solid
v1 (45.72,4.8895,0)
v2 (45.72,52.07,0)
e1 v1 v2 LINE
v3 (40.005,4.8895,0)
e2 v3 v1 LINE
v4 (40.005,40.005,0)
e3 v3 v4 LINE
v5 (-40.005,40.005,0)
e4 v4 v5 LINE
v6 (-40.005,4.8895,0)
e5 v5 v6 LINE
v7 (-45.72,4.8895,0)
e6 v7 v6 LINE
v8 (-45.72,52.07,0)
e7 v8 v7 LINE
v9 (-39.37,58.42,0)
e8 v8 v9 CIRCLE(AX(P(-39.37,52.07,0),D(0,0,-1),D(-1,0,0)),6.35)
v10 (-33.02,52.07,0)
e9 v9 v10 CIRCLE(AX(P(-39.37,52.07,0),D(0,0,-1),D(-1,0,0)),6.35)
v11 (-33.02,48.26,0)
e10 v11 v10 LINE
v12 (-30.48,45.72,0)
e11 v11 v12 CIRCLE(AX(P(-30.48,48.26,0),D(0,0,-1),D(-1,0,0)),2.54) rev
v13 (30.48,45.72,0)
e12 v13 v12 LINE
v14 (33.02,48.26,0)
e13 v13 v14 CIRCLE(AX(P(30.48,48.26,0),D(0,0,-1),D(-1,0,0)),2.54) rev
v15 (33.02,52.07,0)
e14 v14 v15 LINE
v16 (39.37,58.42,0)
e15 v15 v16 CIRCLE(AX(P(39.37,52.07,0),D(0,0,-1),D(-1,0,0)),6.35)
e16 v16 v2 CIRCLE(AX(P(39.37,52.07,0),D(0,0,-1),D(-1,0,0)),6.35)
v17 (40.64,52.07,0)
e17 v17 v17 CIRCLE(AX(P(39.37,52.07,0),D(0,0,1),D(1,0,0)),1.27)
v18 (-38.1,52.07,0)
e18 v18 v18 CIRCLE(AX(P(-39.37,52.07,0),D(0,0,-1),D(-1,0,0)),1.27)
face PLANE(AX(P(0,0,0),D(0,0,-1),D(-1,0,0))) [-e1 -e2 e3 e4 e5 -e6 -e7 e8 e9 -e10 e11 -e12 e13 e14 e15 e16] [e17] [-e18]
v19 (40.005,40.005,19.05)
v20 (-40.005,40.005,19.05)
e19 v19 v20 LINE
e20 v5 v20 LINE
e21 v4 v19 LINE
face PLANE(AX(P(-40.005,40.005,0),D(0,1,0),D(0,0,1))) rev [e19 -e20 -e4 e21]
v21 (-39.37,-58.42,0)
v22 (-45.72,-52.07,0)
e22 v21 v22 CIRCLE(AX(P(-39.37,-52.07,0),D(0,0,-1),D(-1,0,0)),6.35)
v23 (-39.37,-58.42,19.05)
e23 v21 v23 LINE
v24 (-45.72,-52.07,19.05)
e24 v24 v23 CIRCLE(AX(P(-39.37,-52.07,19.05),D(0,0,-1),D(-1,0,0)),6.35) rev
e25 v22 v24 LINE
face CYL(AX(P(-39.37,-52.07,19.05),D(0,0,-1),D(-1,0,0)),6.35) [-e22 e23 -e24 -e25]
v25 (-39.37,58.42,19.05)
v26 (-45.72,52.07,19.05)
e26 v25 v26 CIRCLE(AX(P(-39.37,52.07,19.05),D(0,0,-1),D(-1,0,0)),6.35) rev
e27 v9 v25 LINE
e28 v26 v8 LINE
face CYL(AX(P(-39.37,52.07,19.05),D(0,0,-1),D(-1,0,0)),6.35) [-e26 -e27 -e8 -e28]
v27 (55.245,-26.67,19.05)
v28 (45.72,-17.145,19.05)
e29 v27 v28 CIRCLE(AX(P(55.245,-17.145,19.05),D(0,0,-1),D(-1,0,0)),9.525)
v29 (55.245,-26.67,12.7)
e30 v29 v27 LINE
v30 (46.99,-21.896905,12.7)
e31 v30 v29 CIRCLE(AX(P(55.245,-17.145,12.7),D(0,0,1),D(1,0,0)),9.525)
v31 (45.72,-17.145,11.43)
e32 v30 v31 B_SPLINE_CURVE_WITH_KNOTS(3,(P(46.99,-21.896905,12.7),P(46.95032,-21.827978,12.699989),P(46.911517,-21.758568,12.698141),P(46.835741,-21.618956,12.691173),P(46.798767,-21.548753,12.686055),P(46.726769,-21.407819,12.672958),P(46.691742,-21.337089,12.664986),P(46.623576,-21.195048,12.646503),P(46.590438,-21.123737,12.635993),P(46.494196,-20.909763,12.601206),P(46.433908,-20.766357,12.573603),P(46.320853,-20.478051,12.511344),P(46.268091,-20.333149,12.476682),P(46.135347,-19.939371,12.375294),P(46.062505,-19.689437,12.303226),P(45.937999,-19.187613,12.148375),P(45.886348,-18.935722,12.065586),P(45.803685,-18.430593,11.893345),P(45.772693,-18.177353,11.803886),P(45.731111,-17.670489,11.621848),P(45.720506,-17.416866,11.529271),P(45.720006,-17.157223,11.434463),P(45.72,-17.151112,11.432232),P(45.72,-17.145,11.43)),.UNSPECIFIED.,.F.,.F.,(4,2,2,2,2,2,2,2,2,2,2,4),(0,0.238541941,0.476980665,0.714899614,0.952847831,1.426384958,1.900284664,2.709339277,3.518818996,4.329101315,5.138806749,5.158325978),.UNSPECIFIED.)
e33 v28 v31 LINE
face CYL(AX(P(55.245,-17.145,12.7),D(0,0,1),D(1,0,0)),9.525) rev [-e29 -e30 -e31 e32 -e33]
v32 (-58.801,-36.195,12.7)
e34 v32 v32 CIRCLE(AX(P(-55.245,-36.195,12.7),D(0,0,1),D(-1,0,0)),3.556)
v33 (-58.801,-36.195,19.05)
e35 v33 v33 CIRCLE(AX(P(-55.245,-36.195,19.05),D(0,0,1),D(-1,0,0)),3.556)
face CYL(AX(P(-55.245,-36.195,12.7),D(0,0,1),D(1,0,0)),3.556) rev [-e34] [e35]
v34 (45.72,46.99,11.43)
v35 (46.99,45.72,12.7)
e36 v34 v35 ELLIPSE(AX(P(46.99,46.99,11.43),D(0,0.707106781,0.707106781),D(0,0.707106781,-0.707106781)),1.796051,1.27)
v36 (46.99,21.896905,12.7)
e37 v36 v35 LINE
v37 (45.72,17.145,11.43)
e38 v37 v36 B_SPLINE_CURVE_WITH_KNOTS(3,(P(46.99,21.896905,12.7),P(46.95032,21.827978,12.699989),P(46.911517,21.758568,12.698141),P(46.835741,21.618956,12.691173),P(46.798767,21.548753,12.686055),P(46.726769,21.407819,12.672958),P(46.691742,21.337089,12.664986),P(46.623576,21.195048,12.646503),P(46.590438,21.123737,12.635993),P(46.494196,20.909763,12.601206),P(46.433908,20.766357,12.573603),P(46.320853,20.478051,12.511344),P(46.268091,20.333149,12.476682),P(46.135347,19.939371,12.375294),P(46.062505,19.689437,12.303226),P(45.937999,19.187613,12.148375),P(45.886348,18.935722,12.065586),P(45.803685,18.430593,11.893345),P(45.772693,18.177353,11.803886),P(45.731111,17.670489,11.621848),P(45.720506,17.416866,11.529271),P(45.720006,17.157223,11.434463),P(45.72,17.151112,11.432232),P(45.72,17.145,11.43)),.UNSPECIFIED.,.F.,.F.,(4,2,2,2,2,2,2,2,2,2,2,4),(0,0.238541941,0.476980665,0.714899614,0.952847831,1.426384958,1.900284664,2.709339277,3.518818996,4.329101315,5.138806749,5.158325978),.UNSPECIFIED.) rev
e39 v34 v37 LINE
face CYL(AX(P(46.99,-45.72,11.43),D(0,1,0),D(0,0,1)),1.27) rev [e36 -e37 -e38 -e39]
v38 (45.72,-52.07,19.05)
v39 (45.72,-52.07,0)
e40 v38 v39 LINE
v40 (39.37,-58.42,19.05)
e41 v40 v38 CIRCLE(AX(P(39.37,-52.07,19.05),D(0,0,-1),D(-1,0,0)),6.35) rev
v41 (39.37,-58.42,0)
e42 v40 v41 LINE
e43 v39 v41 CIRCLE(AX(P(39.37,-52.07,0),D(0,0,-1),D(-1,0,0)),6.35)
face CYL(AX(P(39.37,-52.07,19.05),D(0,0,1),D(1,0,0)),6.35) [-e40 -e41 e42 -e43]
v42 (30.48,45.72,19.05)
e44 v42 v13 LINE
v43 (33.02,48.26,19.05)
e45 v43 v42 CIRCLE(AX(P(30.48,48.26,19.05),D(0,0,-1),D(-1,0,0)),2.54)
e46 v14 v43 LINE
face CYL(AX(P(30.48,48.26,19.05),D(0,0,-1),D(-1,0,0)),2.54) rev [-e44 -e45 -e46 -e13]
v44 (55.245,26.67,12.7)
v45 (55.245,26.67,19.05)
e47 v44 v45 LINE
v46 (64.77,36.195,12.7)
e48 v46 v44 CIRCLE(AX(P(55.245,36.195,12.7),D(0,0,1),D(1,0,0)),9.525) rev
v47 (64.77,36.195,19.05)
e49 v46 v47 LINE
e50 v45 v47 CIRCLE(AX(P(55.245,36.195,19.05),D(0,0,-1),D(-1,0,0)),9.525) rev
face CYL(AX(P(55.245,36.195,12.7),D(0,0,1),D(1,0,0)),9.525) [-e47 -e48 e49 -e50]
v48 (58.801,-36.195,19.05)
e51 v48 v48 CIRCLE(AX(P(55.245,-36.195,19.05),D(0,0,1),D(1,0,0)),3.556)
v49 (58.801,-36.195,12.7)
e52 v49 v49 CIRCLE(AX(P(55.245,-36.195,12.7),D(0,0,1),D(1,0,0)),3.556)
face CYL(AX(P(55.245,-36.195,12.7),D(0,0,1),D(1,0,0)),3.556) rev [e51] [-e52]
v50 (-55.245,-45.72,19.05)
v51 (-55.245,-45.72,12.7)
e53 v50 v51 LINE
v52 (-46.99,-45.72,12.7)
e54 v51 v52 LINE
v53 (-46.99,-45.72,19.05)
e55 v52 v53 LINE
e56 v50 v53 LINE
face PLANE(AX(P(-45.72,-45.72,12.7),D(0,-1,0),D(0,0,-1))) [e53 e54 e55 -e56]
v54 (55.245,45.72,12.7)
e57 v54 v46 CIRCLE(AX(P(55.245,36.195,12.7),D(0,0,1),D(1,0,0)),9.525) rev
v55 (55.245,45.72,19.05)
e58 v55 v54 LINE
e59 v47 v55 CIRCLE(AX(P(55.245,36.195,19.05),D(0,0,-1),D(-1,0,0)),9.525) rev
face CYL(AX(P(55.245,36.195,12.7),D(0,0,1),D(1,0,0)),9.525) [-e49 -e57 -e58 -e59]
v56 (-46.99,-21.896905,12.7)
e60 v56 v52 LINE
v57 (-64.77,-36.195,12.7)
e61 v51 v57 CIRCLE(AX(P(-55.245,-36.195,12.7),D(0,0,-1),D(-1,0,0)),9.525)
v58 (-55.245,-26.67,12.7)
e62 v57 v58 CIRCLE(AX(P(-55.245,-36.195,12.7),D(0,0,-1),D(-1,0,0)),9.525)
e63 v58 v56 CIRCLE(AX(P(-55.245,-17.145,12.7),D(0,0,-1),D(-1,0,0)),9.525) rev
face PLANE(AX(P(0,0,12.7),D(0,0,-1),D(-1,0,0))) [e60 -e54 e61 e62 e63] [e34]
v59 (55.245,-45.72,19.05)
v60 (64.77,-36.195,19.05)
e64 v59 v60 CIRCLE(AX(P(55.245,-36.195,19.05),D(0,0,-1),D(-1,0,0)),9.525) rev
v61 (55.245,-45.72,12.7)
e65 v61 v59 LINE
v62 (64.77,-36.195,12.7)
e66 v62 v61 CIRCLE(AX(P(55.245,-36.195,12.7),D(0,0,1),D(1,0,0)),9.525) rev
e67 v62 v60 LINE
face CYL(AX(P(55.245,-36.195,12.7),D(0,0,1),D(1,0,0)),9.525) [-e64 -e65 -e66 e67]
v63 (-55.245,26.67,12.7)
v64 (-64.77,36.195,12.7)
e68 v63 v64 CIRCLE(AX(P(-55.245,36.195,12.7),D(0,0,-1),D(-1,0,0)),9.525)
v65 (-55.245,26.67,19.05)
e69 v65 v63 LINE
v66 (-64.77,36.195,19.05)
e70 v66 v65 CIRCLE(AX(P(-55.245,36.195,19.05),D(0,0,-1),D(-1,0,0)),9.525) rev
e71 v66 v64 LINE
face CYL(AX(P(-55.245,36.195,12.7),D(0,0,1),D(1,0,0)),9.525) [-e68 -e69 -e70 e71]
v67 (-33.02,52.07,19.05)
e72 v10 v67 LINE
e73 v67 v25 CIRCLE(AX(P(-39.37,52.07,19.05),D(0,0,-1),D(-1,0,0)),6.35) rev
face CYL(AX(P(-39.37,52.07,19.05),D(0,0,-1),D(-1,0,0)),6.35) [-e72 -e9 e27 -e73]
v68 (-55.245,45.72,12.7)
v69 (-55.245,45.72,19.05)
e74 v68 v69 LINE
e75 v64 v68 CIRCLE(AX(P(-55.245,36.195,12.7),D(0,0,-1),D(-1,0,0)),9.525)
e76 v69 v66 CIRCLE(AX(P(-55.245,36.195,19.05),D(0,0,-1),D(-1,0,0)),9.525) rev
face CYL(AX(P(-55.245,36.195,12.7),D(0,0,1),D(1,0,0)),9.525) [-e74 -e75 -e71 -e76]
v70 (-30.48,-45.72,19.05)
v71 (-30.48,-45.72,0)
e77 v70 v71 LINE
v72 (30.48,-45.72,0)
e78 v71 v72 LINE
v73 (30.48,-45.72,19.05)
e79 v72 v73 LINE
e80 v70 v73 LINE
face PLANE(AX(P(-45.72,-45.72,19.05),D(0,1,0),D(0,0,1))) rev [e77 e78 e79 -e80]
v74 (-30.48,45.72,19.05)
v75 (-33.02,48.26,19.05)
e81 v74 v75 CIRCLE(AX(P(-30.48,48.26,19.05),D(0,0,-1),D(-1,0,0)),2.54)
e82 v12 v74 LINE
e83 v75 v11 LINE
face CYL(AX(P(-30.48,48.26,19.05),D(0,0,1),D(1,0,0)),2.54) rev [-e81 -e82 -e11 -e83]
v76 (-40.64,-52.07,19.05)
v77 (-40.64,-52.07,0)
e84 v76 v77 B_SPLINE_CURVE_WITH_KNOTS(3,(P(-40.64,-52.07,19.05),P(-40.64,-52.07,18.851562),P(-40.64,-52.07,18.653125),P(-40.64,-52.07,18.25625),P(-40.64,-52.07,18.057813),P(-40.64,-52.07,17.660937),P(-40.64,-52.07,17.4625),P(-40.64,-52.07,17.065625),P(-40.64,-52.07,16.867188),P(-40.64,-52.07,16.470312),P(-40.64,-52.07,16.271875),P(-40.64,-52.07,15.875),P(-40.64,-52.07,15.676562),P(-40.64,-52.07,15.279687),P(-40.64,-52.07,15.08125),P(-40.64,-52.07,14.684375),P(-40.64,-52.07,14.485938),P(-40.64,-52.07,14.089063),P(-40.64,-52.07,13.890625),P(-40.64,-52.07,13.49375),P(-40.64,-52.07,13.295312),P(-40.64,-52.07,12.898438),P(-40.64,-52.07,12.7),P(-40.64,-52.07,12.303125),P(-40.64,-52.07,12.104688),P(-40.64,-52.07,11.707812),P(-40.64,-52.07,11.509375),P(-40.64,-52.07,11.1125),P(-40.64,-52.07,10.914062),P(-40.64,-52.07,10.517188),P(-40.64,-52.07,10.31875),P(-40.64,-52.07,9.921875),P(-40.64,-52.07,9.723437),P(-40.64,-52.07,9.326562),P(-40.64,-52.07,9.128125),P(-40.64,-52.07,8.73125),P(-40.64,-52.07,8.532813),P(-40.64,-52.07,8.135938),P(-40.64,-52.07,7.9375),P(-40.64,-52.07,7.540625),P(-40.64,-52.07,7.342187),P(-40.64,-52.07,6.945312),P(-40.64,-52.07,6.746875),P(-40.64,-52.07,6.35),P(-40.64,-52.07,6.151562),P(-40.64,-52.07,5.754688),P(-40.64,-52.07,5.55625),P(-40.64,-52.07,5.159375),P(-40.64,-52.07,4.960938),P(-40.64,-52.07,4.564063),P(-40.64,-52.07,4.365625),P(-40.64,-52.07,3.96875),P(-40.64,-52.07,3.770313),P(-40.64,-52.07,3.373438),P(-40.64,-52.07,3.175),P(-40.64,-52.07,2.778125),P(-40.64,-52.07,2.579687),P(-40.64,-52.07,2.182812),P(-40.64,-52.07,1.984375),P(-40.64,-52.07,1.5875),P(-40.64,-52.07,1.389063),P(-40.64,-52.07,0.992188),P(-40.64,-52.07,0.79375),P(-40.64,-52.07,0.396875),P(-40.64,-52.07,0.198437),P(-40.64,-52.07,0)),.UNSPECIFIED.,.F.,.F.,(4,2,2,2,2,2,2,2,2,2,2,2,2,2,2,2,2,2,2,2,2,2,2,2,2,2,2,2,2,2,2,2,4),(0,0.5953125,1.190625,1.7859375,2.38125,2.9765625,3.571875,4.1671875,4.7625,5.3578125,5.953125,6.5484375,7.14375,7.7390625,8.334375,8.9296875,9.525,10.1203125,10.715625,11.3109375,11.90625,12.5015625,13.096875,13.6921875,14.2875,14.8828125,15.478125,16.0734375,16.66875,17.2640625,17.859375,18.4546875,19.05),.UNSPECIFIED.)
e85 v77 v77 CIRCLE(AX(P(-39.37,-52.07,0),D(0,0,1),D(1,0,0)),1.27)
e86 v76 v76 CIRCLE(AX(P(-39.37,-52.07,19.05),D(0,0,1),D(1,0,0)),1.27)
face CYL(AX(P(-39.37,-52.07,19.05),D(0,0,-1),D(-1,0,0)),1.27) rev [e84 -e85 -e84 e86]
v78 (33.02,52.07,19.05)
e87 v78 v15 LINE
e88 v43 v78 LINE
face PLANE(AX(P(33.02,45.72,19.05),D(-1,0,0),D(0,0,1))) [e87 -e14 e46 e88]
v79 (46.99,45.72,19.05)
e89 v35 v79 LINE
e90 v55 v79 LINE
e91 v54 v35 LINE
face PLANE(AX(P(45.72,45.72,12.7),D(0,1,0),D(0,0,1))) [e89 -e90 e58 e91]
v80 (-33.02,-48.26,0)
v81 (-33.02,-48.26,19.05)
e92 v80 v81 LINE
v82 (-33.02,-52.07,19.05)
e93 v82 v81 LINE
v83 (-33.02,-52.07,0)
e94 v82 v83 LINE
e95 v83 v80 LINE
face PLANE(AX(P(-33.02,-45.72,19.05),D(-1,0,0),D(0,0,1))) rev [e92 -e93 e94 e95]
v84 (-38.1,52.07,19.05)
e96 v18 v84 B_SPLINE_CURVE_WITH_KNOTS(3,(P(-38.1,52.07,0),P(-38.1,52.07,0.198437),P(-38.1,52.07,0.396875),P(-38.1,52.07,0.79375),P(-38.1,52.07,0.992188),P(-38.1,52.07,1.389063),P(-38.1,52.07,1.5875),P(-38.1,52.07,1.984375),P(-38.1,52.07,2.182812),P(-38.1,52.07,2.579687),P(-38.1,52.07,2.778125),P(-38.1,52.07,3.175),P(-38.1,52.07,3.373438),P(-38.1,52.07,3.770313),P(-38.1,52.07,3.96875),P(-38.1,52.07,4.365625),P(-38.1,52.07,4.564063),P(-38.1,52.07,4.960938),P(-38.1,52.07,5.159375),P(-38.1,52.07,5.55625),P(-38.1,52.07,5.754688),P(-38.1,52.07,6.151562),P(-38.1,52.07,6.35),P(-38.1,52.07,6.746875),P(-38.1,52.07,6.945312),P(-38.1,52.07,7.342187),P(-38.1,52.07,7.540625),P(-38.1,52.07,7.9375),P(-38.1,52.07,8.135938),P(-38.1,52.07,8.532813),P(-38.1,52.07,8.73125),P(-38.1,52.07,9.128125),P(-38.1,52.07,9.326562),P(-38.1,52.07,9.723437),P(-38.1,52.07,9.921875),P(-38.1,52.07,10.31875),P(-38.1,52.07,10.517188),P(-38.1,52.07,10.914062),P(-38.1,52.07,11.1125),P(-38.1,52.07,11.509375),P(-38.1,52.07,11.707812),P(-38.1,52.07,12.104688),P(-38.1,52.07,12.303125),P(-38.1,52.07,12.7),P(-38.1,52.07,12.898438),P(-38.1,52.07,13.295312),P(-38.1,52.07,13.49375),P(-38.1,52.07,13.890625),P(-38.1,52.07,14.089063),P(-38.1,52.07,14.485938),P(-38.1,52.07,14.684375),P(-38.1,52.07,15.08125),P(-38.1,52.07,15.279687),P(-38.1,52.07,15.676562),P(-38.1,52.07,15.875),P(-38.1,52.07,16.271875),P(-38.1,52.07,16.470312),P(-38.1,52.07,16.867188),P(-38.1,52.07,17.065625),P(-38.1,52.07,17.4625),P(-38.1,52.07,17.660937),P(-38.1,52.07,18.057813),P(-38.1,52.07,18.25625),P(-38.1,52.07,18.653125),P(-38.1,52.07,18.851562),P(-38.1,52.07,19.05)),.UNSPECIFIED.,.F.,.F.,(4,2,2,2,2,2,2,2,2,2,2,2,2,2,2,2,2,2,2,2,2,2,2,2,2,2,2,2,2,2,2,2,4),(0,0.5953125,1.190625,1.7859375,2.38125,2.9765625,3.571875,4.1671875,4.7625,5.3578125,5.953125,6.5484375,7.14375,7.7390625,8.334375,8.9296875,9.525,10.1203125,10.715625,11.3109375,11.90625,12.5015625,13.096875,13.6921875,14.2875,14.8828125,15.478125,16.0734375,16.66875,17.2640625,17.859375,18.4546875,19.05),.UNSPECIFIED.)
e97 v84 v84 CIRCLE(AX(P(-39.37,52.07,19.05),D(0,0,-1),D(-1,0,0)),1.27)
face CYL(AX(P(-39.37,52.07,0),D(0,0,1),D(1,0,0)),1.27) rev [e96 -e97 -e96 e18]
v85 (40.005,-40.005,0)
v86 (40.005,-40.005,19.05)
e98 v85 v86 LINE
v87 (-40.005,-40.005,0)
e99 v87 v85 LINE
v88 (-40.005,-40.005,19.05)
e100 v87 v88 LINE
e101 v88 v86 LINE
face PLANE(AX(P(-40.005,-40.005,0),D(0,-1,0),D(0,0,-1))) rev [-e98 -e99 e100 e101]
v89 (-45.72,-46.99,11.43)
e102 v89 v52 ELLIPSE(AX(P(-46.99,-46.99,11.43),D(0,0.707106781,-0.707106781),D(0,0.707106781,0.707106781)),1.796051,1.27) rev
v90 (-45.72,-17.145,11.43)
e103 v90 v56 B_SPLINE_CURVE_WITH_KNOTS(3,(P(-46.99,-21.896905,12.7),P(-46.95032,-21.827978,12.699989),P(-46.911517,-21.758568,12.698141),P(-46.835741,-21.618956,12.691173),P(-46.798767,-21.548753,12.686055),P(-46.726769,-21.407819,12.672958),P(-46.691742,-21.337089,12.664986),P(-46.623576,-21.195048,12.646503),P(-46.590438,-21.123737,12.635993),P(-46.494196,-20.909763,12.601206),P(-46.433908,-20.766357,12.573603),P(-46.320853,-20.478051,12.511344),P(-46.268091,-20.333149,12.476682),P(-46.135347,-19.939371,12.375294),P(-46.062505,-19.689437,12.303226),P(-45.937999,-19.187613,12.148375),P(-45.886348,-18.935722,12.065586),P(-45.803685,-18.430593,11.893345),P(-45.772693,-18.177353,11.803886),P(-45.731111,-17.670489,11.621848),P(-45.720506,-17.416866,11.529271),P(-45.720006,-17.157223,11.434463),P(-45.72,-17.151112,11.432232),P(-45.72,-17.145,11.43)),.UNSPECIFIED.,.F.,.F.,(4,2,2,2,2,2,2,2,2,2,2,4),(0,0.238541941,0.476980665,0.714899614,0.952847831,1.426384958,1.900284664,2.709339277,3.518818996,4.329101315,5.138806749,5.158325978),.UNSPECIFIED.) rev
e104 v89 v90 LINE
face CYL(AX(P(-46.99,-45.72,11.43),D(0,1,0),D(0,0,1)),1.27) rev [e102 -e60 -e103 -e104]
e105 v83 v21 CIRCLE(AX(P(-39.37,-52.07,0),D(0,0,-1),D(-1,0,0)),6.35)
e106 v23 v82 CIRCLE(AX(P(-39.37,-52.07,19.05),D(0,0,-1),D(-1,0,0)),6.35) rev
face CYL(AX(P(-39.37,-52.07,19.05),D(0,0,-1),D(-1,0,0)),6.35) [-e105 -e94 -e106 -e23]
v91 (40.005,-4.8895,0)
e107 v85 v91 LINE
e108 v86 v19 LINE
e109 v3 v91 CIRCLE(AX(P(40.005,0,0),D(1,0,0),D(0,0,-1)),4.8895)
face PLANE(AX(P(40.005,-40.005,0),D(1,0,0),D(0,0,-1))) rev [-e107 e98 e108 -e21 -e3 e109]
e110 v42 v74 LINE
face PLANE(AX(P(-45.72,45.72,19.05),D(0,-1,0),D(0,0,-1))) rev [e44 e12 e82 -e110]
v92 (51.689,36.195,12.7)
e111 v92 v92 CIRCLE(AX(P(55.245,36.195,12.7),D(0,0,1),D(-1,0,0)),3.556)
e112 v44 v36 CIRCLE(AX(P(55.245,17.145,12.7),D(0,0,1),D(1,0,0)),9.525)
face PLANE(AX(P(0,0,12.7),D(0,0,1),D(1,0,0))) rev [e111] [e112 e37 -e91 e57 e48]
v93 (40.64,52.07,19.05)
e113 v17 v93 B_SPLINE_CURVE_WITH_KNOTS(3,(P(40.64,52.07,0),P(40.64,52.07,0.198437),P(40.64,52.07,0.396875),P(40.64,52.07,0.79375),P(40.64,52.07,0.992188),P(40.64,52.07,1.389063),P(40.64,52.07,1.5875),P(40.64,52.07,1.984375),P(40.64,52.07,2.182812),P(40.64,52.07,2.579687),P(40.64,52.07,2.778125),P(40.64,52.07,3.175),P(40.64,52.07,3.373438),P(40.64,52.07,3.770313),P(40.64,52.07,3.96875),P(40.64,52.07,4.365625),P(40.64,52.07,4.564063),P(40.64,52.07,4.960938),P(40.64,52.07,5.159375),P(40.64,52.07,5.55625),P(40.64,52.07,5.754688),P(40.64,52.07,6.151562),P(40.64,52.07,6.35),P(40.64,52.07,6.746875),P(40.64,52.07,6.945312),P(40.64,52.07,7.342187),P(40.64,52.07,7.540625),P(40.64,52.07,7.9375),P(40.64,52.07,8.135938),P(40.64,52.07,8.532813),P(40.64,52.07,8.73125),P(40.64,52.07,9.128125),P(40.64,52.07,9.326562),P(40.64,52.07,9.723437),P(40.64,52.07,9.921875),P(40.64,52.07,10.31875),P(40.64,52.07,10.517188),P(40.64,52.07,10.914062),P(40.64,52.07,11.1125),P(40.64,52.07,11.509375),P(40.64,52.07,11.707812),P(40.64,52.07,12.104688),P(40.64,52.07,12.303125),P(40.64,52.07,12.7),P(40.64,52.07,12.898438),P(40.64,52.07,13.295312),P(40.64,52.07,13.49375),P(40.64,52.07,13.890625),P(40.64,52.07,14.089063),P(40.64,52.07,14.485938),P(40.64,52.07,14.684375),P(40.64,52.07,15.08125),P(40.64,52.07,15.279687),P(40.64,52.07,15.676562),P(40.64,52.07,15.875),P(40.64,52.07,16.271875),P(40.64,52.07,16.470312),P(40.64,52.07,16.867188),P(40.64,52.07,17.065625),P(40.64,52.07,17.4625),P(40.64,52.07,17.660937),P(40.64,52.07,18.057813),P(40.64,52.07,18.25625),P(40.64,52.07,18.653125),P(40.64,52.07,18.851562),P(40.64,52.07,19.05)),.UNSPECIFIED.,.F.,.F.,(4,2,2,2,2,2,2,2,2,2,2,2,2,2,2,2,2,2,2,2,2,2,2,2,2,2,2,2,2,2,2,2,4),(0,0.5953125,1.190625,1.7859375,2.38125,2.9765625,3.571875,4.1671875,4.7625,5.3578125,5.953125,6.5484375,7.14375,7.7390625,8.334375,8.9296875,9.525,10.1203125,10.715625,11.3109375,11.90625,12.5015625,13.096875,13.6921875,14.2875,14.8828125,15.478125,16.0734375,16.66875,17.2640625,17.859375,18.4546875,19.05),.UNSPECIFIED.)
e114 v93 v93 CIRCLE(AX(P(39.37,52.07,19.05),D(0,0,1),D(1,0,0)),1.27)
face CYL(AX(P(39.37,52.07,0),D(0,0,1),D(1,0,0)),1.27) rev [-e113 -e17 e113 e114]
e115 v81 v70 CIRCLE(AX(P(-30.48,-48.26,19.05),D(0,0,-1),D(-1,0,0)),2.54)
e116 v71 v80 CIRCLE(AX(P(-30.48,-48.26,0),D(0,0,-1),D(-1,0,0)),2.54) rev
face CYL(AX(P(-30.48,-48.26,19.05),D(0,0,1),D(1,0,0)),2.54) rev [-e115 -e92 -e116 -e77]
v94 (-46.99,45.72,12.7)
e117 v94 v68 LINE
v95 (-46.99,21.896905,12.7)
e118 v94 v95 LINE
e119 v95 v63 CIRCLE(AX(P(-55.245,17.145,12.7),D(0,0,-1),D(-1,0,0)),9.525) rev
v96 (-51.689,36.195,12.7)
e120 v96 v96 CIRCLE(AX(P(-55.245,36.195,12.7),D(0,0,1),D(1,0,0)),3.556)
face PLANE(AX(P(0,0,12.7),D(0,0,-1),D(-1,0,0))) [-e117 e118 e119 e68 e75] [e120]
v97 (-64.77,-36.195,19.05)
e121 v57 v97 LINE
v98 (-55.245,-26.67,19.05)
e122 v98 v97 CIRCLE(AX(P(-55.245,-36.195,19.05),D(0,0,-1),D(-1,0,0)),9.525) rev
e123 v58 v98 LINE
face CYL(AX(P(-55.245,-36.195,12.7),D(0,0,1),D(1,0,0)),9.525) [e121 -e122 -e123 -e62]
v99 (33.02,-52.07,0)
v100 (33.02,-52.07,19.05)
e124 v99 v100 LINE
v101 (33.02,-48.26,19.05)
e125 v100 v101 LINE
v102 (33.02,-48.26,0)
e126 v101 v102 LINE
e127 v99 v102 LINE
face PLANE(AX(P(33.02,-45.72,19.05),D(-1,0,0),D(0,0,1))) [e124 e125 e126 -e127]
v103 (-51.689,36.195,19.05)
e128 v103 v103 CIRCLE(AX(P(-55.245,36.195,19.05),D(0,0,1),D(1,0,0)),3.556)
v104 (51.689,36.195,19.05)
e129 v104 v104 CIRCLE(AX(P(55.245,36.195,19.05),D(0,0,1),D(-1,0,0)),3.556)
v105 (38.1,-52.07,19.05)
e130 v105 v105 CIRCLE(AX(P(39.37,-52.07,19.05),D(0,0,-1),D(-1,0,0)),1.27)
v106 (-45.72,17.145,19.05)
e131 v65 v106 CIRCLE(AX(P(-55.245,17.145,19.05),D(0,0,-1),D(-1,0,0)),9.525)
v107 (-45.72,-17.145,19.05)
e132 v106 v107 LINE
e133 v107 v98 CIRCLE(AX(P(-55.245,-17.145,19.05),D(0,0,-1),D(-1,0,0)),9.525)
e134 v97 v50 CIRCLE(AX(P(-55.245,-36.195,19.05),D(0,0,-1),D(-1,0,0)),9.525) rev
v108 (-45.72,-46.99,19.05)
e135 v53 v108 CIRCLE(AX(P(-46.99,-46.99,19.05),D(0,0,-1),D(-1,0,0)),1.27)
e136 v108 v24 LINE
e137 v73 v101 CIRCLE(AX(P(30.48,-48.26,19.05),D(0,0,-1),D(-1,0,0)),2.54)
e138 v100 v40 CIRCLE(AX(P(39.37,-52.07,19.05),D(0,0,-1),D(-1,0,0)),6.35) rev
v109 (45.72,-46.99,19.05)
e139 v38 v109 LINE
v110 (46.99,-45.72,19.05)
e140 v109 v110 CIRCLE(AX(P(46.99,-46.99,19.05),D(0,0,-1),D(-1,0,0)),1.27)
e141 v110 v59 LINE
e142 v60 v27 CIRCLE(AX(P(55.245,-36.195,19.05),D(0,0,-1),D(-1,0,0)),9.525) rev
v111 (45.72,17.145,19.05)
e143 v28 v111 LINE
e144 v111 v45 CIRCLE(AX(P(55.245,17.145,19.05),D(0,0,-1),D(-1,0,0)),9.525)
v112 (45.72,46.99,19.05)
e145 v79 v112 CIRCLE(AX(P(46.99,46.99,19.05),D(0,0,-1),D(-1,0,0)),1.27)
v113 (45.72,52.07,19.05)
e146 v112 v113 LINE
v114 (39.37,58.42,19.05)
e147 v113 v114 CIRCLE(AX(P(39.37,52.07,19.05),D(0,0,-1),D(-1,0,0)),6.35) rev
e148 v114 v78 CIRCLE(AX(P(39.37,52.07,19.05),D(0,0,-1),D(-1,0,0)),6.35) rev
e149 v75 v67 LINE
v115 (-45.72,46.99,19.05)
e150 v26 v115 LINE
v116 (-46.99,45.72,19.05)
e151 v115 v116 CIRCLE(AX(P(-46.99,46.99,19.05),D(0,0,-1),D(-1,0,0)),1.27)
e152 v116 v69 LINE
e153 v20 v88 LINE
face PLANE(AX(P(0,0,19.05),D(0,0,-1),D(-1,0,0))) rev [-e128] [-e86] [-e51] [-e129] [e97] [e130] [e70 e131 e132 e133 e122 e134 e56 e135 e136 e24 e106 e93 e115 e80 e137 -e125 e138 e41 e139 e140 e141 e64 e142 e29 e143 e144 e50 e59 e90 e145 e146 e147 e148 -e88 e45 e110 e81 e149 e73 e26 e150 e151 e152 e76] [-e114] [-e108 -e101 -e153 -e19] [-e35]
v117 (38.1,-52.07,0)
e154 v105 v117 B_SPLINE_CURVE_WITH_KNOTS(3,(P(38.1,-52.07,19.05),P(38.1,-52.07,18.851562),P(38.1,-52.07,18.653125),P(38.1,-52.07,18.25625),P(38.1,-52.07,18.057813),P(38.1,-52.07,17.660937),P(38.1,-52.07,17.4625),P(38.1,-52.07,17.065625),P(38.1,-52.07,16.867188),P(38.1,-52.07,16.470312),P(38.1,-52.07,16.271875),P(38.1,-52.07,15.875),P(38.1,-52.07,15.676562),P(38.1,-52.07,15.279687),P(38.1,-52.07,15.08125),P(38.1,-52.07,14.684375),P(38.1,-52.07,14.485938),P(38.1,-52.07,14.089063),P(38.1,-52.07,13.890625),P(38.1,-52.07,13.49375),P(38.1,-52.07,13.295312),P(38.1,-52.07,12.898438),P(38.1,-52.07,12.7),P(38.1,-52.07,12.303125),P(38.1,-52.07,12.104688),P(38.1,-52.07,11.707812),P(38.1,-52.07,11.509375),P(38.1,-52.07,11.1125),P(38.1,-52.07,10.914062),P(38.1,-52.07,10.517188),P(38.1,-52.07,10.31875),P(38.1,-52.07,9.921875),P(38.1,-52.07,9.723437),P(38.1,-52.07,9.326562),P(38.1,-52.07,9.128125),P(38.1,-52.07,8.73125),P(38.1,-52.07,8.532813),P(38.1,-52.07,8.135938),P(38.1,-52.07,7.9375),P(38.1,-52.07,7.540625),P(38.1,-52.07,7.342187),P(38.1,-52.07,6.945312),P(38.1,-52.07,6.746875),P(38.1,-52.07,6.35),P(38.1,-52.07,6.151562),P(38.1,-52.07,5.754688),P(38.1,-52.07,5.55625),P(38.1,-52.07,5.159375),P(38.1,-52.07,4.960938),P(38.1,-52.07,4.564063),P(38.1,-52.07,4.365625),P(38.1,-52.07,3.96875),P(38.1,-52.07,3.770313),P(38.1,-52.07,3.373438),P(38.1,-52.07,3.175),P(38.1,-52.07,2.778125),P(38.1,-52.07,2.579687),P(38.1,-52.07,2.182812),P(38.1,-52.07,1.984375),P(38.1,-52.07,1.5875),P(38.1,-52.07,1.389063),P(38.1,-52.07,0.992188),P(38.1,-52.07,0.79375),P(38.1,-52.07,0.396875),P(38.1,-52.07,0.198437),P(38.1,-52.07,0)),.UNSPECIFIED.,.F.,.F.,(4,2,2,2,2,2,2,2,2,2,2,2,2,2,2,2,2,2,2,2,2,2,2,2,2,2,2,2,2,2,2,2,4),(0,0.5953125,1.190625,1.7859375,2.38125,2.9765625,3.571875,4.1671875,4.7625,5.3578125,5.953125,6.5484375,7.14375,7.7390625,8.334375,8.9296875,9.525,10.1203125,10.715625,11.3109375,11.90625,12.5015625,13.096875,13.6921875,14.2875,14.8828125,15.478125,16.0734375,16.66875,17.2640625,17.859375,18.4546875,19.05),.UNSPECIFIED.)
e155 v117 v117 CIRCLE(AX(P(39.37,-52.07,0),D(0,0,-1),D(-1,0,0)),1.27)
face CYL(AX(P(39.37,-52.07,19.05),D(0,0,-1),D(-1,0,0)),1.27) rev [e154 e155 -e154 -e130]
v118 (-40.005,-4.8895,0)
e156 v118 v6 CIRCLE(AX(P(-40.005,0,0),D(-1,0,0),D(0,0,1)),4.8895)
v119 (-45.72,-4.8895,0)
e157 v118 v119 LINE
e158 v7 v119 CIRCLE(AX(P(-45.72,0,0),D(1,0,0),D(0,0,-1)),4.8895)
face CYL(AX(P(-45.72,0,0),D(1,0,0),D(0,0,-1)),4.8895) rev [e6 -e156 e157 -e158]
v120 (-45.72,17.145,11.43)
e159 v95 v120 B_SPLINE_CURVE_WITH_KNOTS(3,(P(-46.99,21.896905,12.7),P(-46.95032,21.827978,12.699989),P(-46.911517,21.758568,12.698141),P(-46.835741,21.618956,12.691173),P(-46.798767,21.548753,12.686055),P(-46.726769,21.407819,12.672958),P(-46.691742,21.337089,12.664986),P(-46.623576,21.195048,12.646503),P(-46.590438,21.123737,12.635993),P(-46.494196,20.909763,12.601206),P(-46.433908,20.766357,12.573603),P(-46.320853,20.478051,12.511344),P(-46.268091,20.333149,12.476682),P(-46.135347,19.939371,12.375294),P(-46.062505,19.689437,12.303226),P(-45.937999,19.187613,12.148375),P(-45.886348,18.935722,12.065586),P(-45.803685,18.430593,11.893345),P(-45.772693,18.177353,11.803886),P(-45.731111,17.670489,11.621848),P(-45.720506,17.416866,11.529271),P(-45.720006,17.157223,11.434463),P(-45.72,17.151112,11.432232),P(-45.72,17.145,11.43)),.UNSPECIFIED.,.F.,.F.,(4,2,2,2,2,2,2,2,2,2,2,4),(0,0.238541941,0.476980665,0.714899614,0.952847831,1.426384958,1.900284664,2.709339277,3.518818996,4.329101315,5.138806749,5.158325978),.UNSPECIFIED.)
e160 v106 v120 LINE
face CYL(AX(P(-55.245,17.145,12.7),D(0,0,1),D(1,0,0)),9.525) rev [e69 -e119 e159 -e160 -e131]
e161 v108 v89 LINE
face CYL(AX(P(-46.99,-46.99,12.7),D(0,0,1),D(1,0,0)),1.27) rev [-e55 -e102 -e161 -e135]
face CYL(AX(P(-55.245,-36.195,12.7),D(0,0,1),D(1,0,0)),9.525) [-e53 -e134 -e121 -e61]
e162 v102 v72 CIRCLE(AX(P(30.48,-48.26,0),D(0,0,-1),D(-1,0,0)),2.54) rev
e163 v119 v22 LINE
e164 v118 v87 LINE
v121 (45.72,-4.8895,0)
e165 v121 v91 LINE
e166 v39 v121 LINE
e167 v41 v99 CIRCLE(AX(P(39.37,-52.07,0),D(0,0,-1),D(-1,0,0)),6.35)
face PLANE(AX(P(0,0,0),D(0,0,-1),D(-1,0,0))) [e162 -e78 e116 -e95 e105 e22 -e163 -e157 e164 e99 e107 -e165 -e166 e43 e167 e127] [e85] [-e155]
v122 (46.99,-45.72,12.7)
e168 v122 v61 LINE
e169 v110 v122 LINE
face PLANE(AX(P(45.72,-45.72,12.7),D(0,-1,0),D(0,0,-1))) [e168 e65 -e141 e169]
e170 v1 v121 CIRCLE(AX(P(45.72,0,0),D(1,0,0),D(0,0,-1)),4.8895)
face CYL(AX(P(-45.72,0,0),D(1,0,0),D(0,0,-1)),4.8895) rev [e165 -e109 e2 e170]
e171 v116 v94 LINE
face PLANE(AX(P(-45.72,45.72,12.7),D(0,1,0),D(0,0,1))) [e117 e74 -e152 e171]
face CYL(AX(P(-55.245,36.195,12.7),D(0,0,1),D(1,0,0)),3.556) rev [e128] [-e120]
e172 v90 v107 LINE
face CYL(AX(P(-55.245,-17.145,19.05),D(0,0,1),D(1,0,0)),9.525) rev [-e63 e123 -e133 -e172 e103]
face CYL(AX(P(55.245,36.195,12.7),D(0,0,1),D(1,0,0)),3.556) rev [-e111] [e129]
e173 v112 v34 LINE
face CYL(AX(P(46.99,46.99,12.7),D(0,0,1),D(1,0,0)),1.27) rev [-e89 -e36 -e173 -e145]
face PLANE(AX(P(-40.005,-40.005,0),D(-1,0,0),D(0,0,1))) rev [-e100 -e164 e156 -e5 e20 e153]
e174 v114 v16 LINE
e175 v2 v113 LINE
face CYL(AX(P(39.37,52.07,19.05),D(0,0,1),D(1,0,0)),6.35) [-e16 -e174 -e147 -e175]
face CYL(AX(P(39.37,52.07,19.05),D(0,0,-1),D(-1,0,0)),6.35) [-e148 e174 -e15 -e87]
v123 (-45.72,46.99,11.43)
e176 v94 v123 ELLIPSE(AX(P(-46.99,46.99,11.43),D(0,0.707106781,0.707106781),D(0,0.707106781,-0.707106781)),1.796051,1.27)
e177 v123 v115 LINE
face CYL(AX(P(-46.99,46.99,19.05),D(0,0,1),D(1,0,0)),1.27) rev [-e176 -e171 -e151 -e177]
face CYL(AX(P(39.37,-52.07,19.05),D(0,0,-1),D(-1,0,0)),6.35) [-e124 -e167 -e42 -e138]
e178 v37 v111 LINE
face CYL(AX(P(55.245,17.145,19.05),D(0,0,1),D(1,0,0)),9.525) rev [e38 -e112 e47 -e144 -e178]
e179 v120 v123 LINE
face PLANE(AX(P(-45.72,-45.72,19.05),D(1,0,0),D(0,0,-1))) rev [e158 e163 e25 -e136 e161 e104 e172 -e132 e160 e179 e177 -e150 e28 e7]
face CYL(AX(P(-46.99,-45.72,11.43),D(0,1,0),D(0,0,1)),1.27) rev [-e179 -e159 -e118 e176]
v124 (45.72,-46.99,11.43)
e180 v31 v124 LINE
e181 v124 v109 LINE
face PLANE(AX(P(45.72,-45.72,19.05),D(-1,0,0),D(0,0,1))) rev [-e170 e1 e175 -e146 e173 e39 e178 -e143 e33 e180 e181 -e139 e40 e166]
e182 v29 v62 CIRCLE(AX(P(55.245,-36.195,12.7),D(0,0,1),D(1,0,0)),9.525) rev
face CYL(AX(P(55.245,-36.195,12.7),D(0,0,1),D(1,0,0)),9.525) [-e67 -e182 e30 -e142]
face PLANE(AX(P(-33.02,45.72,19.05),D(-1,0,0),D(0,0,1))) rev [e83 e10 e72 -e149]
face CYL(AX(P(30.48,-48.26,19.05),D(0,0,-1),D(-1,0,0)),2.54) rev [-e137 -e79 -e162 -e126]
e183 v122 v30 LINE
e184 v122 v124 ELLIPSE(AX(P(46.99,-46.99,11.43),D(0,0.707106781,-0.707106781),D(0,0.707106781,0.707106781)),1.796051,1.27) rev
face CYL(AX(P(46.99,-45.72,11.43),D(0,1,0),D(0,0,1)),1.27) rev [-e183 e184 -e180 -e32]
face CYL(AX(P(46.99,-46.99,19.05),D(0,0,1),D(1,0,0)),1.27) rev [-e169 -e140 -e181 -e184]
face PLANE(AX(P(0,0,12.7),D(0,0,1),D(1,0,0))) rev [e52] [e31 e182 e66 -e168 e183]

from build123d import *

# Parameters (mm, degrees)
SKETCH1_W            = 91.44
SKETCH1_H            = 91.44
BOSS_EXTRUDE1_DEPTH  = 19.05
SKETCH2_W            = 80.01
SKETCH2_H            = 80.01
CUT_EXTRUDE1_DEPTH   = 68.405780909
SKETCH3_R            = 4.8895
CUT_EXTRUDE2_DEPTH   = 104.992761767
SKETCH4_W            = 12.7
SKETCH4_H            = 12.7
BOSS_EXTRUDE2_DEPTH  = 19.05
SKETCH5_R            = 1.27
CUT_EXTRUDE3_DEPTH   = 77.590582319
FILLET1_R            = 6.35
SKETCH6_W            = 12.7
SKETCH6_H            = 12.7
SKETCH6_R            = 1.27
BOSS_EXTRUDE3_DEPTH  = 19.05
FILLET4_R            = 6.35
FILLET1_OF_MIRROR8_R = 6.35
FILLET4_OF_MIRROR8_R = 6.35
FILLET5_R            = 2.54
SKETCH7_W            = 19.05
SKETCH7_H            = 19.05
SKETCH7_R            = 3.556
BOSS_EXTRUDE4_DEPTH  = 6.35
FILLET6_R            = 9.525
FILLET7_R            = 1.27
FILLET8_R            = 1.27


with BuildPart() as part:
    # Sketch1 → Boss-Extrude1 (new body)
    with BuildSketch(Plane.XY):
        Rectangle(SKETCH1_W, SKETCH1_H)
    extrude(amount=BOSS_EXTRUDE1_DEPTH)

    # Sketch2 → Cut-Extrude1 (cut, through all)
    with BuildSketch(Plane.XY.offset(19.05)):
        Rectangle(SKETCH2_W, SKETCH2_H)
    extrude(amount=-CUT_EXTRUDE1_DEPTH, mode=Mode.SUBTRACT)

    # Sketch3 → Cut-Extrude2 (cut, through all)
    with BuildSketch(Plane(origin=(45.72, 0, 0), x_dir=(0, 0, -1), z_dir=(1, 0, 0))):
        Circle(SKETCH3_R)
        with Locations((0, 57.404)):
            Circle(SKETCH3_R)
        with Locations((0, -57.404)):
            Circle(SKETCH3_R)
    extrude(amount=-CUT_EXTRUDE2_DEPTH, mode=Mode.SUBTRACT)

    # Sketch4 → Boss-Extrude2 (add, through all)
    with BuildSketch(Plane(origin=(0, 0, 0), x_dir=(-1, 0, 0), z_dir=(0, 0, -1))):
        with Locations((-39.37, 52.07)):
            Rectangle(SKETCH4_W, SKETCH4_H)
    boss_extrude2 = extrude(amount=-BOSS_EXTRUDE2_DEPTH)

    # Sketch5 → Cut-Extrude3 (cut, through all)
    with BuildSketch(Plane.XY.offset(19.05)):
        with Locations((39.37, 52.07)):
            Circle(SKETCH5_R)
    cut_extrude3 = extrude(amount=-CUT_EXTRUDE3_DEPTH, mode=Mode.SUBTRACT)

    # Fillet1
    fillet1_edges = [part.edges().sort_by_distance(p)[0] for p in [
        (33.02, 58.42, 9.525),
        (45.72, 58.42, 9.525),
    ]]
    fillet(fillet1_edges, radius=FILLET1_R - 0.0001)  # a hair under: the kernel refuses the full size

    # Sketch6 → Boss-Extrude3 (add, through all)
    with BuildSketch(Plane(origin=(0, 0, 0), x_dir=(-1, 0, 0), z_dir=(0, 0, -1))):
        with Locations((-39.37, -52.07)):
            Rectangle(SKETCH6_W, SKETCH6_H)
        with Locations((-39.37, -52.07)):
            Circle(SKETCH6_R, mode=Mode.SUBTRACT)
    boss_extrude3 = extrude(amount=-BOSS_EXTRUDE3_DEPTH)

    # Fillet4
    fillet4_edges = [part.edges().sort_by_distance(p)[0] for p in [
        (45.72, -58.42, 9.525),
        (33.02, -58.42, 9.525),
    ]]
    fillet(fillet4_edges, radius=FILLET4_R - 0.0001)  # a hair under: the kernel refuses the full size

    # Mirror8: Boss-Extrude2, Cut-Extrude3, Boss-Extrude3 across plane
    add(boss_extrude2.mirror(Plane(origin=(0, 0, 0), x_dir=(0, 0, 1), z_dir=(1, 0, 0))))
    add(cut_extrude3.mirror(Plane(origin=(0, 0, 0), x_dir=(0, 0, 1), z_dir=(1, 0, 0))), mode=Mode.SUBTRACT)
    add(boss_extrude3.mirror(Plane(origin=(0, 0, 0), x_dir=(0, 0, 1), z_dir=(1, 0, 0))))

    # Fillet1 of Mirror8
    fillet1_of_mirror8_edges = [part.edges().sort_by_distance(p)[0] for p in [
        (-33.02, 58.42, 9.525),
        (-45.72, 58.42, 9.525),
    ]]
    fillet(fillet1_of_mirror8_edges, radius=FILLET1_OF_MIRROR8_R - 0.0001)  # a hair under: the kernel refuses the full size

    # Fillet4 of Mirror8
    fillet4_of_mirror8_edges = [part.edges().sort_by_distance(p)[0] for p in [
        (-45.72, -58.42, 9.525),
        (-33.02, -58.42, 9.525),
    ]]
    fillet(fillet4_of_mirror8_edges, radius=FILLET4_OF_MIRROR8_R - 0.0001)  # a hair under: the kernel refuses the full size

    # Fillet5
    fillet5_edges = [part.edges().sort_by_distance(p)[0] for p in [
        (-33.02, 45.72, 9.525),
        (-33.02, -45.72, 9.525),
        (33.02, 45.72, 9.525),
        (33.02, -45.72, 9.525),
    ]]
    fillet(fillet5_edges, radius=FILLET5_R)

    # Sketch7 → Boss-Extrude4 (add)
    # profile 1 of 4: a face of its own
    with BuildSketch(Plane.XY.offset(19.05)):
        with Locations((-55.245, 36.195)):
            Rectangle(SKETCH7_W, SKETCH7_H)
        with Locations((-55.245, 36.195)):
            Circle(SKETCH7_R, mode=Mode.SUBTRACT)
    # profile 2 of 4: a face of its own
    with BuildSketch(Plane.XY.offset(19.05)):
        with Locations((-55.245, -36.195)):
            Rectangle(SKETCH7_W, SKETCH7_H)
        with Locations(Location((-55.245, -36.195, 0), (0, 0, 180))):
            Circle(SKETCH7_R, mode=Mode.SUBTRACT)
    # profile 3 of 4: a face of its own
    with BuildSketch(Plane.XY.offset(19.05)):
        with Locations((55.245, 36.195)):
            Rectangle(SKETCH7_W, SKETCH7_H)
        with Locations(Location((55.245, 36.195, 0), (0, 0, 180))):
            Circle(SKETCH7_R, mode=Mode.SUBTRACT)
    # profile 4 of 4: a face of its own
    with BuildSketch(Plane.XY.offset(19.05)):
        with Locations((55.245, -36.195)):
            Rectangle(SKETCH7_W, SKETCH7_H)
        with Locations((55.245, -36.195)):
            Circle(SKETCH7_R, mode=Mode.SUBTRACT)
    extrude(amount=-BOSS_EXTRUDE4_DEPTH)

    # Fillet6
    fillet6_edges = [part.edges().sort_by_distance(p)[0] for p in [
        (64.77, -45.72, 15.875),
        (45.72, -26.67, 15.875),
        (64.77, -26.67, 15.875),
        (45.72, 26.67, 15.875),
        (64.77, 26.67, 15.875),
        (64.77, 45.72, 15.875),
        (-45.72, 26.67, 15.875),
        (-64.77, 45.72, 15.875),
        (-64.77, 26.67, 15.875),
        (-45.72, -26.67, 15.875),
        (-64.77, -45.72, 15.875),
        (-64.77, -26.67, 15.875),
    ]]
    fillet(fillet6_edges, radius=FILLET6_R - 0.0001)  # a hair under: the kernel refuses the full size

    # Fillet7
    fillet7_edges = [part.edges().sort_by_distance(p)[0] for p in [
        (-45.72, 31.43255, 12.7),
        (-45.72, -31.43255, 12.7),
        (45.72, 31.43255, 12.7),
        (45.72, -31.43255, 12.7),
    ]]
    fillet(fillet7_edges, radius=FILLET7_R)

    # Fillet8
    fillet8_edges = [part.edges().sort_by_distance(p)[0] for p in [
        (-45.72, 45.72, 15.24),
        (-45.72, -45.72, 15.24),
        (45.72, -45.72, 15.24),
        (45.72, 45.72, 15.24),
    ]]
    fillet(fillet8_edges, radius=FILLET8_R)


solid = part.part
